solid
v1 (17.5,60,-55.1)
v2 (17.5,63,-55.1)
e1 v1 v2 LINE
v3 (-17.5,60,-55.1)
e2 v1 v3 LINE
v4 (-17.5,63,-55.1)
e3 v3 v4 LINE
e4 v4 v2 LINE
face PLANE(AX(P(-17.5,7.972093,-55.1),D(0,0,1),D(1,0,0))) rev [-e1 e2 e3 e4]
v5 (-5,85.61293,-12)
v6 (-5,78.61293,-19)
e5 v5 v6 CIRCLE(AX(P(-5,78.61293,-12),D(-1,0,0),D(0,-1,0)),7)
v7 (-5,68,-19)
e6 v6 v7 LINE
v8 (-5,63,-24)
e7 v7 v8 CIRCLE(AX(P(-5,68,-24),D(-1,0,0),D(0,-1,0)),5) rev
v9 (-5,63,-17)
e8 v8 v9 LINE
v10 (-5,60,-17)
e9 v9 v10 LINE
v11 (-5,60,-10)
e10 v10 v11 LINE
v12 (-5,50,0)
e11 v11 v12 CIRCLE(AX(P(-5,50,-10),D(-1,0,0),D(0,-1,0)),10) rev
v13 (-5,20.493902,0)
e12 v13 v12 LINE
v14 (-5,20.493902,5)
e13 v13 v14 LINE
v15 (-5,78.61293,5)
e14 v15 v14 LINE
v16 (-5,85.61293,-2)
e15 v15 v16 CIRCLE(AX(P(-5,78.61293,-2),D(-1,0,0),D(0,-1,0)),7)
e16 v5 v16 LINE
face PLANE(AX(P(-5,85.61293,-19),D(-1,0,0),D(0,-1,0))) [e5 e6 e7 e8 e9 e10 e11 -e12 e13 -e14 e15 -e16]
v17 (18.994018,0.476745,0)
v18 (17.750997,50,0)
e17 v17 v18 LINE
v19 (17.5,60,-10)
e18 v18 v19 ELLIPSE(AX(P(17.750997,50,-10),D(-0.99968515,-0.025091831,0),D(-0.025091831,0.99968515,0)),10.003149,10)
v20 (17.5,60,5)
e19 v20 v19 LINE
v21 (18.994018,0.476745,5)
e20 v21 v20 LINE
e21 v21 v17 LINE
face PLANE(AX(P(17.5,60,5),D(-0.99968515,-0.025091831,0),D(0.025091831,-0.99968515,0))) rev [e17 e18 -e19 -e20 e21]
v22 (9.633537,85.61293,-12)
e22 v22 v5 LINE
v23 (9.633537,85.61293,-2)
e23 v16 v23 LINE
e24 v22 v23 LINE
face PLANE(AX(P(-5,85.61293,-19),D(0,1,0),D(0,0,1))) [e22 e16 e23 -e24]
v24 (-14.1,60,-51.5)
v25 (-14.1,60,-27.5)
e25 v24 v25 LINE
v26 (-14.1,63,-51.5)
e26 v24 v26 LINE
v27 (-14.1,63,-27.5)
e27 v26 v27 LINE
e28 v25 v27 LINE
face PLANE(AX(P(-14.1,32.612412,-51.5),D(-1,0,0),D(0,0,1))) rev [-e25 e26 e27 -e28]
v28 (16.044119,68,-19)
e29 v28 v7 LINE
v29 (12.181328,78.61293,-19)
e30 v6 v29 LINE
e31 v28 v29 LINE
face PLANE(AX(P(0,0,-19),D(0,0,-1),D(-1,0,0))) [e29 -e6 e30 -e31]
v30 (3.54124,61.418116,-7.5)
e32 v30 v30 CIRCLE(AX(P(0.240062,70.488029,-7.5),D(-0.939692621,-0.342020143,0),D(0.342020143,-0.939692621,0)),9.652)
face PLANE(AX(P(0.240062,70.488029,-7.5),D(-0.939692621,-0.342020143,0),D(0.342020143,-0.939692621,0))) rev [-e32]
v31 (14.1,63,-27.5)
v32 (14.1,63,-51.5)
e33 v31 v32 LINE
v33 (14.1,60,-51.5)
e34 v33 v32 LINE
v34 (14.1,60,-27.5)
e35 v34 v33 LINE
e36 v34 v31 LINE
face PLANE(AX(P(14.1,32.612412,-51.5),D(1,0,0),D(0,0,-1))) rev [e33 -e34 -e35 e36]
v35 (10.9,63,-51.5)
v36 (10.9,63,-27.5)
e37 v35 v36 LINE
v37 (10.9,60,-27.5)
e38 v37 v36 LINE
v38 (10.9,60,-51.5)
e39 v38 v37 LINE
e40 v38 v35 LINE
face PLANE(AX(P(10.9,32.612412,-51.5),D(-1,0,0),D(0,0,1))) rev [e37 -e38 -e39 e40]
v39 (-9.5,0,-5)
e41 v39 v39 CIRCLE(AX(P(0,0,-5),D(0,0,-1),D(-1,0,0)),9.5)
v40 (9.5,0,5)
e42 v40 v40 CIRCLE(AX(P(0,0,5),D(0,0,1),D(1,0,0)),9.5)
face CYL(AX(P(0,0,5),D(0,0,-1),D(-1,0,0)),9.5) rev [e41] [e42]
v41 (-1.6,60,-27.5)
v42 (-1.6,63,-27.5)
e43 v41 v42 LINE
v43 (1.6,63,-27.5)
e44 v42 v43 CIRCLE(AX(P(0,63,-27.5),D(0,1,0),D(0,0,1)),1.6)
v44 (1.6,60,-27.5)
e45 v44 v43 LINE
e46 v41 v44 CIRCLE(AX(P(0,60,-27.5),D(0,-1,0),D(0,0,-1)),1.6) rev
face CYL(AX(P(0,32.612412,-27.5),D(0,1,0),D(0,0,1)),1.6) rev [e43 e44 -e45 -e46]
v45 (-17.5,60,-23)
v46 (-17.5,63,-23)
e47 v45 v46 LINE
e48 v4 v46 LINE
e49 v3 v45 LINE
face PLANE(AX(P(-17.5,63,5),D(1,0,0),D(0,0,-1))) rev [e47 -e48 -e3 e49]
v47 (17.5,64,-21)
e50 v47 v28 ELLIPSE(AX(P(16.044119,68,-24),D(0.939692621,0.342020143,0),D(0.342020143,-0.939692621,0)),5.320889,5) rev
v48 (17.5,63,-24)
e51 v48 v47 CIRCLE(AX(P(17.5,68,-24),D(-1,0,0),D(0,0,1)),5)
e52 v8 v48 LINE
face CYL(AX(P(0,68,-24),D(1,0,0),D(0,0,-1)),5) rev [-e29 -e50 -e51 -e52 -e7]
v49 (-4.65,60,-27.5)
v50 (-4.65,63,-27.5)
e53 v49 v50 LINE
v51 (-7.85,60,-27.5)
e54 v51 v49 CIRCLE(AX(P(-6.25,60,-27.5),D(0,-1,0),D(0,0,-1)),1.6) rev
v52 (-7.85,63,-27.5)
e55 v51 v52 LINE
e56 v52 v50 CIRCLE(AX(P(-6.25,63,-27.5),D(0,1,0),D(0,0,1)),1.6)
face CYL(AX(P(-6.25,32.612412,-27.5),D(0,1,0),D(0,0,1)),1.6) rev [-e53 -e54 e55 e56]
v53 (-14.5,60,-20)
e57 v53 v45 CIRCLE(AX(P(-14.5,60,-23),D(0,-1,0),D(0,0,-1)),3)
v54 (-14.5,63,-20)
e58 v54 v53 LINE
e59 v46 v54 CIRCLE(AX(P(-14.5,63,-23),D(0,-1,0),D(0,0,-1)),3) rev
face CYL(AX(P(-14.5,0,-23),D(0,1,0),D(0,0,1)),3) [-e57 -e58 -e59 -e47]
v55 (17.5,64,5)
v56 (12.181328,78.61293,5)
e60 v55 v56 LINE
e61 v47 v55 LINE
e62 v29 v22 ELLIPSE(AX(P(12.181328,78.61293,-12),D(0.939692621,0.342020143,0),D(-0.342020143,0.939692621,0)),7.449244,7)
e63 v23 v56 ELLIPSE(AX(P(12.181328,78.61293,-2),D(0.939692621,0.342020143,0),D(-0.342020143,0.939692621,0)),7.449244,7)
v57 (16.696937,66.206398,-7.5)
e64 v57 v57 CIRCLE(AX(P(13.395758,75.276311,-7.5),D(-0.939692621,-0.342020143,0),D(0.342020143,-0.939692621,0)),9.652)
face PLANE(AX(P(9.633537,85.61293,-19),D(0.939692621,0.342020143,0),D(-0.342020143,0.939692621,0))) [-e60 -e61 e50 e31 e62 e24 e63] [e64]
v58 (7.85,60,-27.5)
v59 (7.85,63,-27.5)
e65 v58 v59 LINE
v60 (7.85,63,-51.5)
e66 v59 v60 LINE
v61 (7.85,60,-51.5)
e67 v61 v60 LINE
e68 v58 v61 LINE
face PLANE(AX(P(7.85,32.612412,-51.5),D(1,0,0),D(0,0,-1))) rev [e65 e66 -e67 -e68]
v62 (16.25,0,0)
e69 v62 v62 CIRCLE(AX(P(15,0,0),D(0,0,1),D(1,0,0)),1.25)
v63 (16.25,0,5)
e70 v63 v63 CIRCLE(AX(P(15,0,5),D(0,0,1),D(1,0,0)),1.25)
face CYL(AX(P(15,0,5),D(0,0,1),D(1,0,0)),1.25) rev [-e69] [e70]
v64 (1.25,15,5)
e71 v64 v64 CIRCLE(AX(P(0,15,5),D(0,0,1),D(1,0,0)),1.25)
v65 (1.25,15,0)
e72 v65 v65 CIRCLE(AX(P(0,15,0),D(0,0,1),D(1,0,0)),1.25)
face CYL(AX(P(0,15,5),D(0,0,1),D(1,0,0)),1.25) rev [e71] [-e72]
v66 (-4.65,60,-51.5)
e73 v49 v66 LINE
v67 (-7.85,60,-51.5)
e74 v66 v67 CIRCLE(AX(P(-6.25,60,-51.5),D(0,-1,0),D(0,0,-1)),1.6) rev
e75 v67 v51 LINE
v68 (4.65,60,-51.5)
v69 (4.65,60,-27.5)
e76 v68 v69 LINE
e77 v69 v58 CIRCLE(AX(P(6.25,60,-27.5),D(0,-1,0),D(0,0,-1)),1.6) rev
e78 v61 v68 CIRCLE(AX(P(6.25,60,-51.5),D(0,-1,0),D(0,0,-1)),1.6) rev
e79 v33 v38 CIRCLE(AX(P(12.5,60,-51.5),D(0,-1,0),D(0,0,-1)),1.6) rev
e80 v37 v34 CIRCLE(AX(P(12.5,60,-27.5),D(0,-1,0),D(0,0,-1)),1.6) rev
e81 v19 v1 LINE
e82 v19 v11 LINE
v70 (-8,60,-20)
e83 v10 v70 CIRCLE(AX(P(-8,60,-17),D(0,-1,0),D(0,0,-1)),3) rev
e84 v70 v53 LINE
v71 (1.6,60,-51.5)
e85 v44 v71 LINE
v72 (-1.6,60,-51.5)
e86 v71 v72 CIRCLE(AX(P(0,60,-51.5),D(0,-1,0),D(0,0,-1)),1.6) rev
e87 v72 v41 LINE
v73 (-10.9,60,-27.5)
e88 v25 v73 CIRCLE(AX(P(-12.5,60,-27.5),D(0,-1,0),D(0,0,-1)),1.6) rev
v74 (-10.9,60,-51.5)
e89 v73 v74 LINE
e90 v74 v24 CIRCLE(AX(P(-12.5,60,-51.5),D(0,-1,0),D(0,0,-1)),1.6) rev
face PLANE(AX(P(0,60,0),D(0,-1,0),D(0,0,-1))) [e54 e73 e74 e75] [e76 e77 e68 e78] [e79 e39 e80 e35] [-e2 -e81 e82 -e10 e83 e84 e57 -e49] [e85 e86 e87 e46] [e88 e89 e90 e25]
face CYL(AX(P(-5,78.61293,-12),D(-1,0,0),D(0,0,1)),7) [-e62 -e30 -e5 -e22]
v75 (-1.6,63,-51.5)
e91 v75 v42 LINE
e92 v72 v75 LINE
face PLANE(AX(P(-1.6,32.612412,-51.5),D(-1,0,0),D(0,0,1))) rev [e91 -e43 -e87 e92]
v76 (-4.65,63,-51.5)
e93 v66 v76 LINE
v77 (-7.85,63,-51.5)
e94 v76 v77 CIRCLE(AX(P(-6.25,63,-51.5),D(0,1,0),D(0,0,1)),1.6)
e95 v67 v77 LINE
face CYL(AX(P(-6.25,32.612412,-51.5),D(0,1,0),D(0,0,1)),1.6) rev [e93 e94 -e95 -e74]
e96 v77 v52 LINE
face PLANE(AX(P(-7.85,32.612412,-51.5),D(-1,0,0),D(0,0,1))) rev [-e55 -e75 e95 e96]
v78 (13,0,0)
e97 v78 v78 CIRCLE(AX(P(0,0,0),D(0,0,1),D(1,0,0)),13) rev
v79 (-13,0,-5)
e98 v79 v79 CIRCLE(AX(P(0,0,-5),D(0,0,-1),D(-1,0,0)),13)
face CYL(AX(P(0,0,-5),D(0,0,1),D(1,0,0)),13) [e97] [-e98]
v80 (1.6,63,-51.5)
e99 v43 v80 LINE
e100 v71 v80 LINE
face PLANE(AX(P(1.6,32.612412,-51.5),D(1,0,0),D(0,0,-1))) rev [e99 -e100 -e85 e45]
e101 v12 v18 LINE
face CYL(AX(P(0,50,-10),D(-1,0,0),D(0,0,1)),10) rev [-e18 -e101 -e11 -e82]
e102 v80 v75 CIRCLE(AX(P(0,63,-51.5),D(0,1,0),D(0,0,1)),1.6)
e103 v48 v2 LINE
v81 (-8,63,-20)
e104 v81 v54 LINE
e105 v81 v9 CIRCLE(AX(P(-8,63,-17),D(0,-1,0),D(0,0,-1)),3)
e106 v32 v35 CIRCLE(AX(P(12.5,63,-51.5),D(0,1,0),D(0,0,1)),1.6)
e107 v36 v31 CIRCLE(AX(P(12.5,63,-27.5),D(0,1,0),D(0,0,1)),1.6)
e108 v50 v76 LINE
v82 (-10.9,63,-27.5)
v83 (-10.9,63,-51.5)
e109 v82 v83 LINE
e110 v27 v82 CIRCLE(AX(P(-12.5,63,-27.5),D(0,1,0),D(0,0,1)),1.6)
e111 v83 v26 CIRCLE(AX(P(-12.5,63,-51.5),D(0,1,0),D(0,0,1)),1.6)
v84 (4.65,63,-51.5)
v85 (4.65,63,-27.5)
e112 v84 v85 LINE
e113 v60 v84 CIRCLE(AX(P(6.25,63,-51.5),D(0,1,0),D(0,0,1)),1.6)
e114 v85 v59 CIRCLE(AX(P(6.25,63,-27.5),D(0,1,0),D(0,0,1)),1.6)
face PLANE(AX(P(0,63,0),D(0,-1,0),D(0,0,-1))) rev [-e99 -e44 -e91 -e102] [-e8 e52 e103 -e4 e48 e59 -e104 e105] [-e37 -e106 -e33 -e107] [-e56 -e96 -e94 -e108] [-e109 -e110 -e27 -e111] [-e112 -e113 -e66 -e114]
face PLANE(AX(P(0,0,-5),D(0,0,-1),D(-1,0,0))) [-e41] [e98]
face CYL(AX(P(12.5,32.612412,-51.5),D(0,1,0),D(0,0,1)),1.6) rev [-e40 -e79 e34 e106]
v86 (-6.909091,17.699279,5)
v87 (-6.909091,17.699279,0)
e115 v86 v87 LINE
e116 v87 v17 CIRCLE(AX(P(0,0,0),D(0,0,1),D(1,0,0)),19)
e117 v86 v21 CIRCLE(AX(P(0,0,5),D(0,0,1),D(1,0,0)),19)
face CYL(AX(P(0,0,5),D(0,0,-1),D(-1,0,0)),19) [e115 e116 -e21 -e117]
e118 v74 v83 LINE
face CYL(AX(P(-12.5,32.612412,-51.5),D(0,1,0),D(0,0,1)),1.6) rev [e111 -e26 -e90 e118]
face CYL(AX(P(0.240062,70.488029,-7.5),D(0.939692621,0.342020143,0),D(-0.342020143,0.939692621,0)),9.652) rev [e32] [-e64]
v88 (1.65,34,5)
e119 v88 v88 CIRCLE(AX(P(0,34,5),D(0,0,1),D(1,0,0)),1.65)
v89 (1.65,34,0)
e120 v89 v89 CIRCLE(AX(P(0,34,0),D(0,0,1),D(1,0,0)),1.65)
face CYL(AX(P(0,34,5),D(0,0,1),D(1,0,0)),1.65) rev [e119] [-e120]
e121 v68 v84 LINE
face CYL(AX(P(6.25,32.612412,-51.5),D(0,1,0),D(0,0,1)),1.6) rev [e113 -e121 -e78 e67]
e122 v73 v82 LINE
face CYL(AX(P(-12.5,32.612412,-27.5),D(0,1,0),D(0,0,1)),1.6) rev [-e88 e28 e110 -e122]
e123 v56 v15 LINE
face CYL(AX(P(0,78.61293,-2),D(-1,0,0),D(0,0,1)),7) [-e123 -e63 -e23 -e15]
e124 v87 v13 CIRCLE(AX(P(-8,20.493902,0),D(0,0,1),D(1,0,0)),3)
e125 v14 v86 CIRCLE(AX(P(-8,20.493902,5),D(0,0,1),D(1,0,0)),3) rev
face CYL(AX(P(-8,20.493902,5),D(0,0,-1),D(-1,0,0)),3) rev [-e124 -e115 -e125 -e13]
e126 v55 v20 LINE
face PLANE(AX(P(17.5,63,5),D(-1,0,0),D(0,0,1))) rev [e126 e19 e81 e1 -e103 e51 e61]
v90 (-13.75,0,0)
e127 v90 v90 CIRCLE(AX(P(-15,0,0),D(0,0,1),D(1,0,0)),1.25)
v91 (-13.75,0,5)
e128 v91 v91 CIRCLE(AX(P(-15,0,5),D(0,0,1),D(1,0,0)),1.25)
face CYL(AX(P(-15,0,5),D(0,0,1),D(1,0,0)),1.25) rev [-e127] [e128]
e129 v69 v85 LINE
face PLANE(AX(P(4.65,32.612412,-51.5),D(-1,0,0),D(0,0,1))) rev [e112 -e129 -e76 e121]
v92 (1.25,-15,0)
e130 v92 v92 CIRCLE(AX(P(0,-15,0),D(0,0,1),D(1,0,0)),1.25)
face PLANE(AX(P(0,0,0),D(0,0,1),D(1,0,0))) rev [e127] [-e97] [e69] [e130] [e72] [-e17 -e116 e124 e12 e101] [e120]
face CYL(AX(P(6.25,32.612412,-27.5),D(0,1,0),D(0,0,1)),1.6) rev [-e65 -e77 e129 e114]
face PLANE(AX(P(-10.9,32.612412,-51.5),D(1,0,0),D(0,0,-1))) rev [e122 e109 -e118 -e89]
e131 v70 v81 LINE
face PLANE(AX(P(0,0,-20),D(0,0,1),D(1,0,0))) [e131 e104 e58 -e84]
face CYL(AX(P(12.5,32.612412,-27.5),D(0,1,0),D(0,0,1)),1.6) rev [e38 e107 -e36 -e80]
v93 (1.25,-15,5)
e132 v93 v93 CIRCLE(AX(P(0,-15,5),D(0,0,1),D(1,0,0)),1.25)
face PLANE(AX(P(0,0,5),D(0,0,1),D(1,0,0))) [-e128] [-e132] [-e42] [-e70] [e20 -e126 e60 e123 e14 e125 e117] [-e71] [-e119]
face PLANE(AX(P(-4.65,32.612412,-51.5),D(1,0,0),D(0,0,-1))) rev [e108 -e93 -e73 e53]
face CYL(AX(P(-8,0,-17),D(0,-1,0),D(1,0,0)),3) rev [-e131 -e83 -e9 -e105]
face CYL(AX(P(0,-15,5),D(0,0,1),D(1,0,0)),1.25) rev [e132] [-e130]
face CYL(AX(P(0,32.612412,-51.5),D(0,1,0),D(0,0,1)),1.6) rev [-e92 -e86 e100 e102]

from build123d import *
from build123d.topology import SkipClean

# Parameters (mm, degrees)
SKETCH2_R                 = 9.5
BOSS_EXTRUDE1_DEPTH       = 5
SKETCH3_W                 = 35
SKETCH3_H                 = 85.128
BOSS_EXTRUDE2_DEPTH       = 3
BOSS_EXTRUDE3_START       = 5
SKETCH4_R                 = 13
SKETCH4_R_2               = 9.5
BOSS_EXTRUDE3_DEPTH       = 5
SKETCH5_W                 = 35
SKETCH5_H                 = 9
BOSS_EXTRUDE4_DEPTH       = 3
M3X0_5_TAPPED_HOLE1_D     = 2.5
M3X0_5_TAPPED_HOLE1_DEPTH = 3
BOSS_EXTRUDE5_DEPTH       = 24
SKETCH11_R                = 9.652
CUT_EXTRUDE1_DEPTH        = 14
CUT_EXTRUDE2_START        = -5
CUT_EXTRUDE2_DEPTH        = 5
CUT_EXTRUDE4_DEPTH        = 3
SKETCH15_W                = 35
SKETCH15_H                = 25.028
CUT_EXTRUDE5_DEPTH        = 12
M3X0_5_TAPPED_HOLE2_D     = 2.5
M3X0_5_TAPPED_HOLE2_DEPTH = 6.5
M3X0_5_TAPPED_HOLE2_TIP   = 0.751075774
FILLET7_R                 = 7
BOSS_EXTRUDE6_START       = -5
BOSS_EXTRUDE6_DEPTH       = 5
FILLET3_R                 = 5
CUT_EXTRUDE6_START        = -25
CUT_EXTRUDE6_DEPTH        = 25
FILLET5_R                 = 10
FILLET4_R                 = 3
M4X0_7_TAPPED_HOLE1_D     = 3.3


with BuildPart() as part:
    # Sketch2 → Boss-Extrude1 (new body)
    with BuildSketch(Plane.XY):
        with BuildLine():
            Line((-18.994017858, 0.476744791), (-17.5, 60))
            Line((-17.5, 60), (17.5, 60))
            Line((17.5, 60), (18.994017858, 0.476744791))
            ThreePointArc((18.994017858, 0.476744791), (0, -19), (-18.994017858, 0.476744791))
        make_face()
        Circle(SKETCH2_R, mode=Mode.SUBTRACT)
    extrude(amount=BOSS_EXTRUDE1_DEPTH)

    # Sketch3 → Boss-Extrude2 (add)
    with BuildSketch(Plane(origin=(0, 60, 0), x_dir=(1, 0, 0), z_dir=(0, 1, 0))):
        with Locations((0, 37.564)):
            Rectangle(SKETCH3_W, SKETCH3_H)
    extrude(amount=BOSS_EXTRUDE2_DEPTH)

    # Sketch4 → Boss-Extrude3 (add)
    with SkipClean():  # the faces are left unmerged after this step: merging them gives an invalid solid
        with BuildSketch(Plane(origin=(0, 0, 0), x_dir=(-1, 0, 0), z_dir=(0, 0, -1)).offset(BOSS_EXTRUDE3_START)):
            with Locations(Location((0, 0, 0), (0, 0, 180))):
                Circle(SKETCH4_R)
            Circle(SKETCH4_R_2, mode=Mode.SUBTRACT)
        extrude(amount=-BOSS_EXTRUDE3_DEPTH)

    # Sketch5 → Boss-Extrude4 (add)
    with SkipClean():  # the faces are left unmerged after this step: merging them gives an invalid solid
        with BuildSketch(Plane(origin=(0, 0, -80.128), x_dir=(-1, 0, 0), z_dir=(0, 0, -1))):
            with Locations((0, 55.5)):
                Rectangle(SKETCH5_W, SKETCH5_H)
        extrude(amount=-BOSS_EXTRUDE4_DEPTH)

    # M3x0.5 Tapped Hole1
    with Locations(Plane(origin=(0, 0, -80.128), x_dir=(1, 0, 0), z_dir=(0, 0, -1))):
        with Locations((12, -55.5), (0, -55.5), (-12, -55.5)):
            Hole(M3X0_5_TAPPED_HOLE1_D / 2, depth=M3X0_5_TAPPED_HOLE1_DEPTH)

    # Sketch10 → Boss-Extrude5 (add)
    with SkipClean():  # the faces are left unmerged after this step: merging them gives an invalid solid
        with BuildSketch(Plane.XY.offset(5)):
            Polygon((-5, 85.612930278), (-5, 63), (17.5, 63), (17.5, 64), (9.633536704, 85.612930278), align=None)
        extrude(amount=-BOSS_EXTRUDE5_DEPTH)

    # Sketch11 → Cut-Extrude1 (cut)
    with SkipClean():  # the faces are left unmerged after this step: merging them gives an invalid solid
        with BuildSketch(Plane(origin=(-1.821352029, 117.084978414, 0), x_dir=(0, 0, -1), z_dir=(-0.9396926207859069, -0.34202014332567293, 0))):
            with Locations(Location((7.5, 44.49185408, 0), (0, 0, 90))):
                Circle(SKETCH11_R)
        extrude(amount=CUT_EXTRUDE1_DEPTH, mode=Mode.SUBTRACT)

    # Sketch12 → Cut-Extrude2 (cut)
    with SkipClean():  # the faces are left unmerged after this step: merging them gives an invalid solid
        with BuildSketch(Plane.XY.offset(5).offset(CUT_EXTRUDE2_START)):
            with BuildLine():
                Line((-13.548939673, 58), (13.548939673, 58))
                Line((13.548939673, 58), (14.702658736, 12.034609511))
                ThreePointArc((14.702658736, 12.034609511), (0, 19), (-14.702658736, 12.034609511))
                Line((-14.702658736, 12.034609511), (-13.548939673, 58))
            make_face()
        extrude(amount=CUT_EXTRUDE2_DEPTH, mode=Mode.SUBTRACT)

    # Sketch14 → Cut-Extrude4 (cut)
    with SkipClean():  # the faces are left unmerged after this step: merging them gives an invalid solid
        with BuildSketch(Plane(origin=(0, 63, 0), x_dir=(1, 0, 0), z_dir=(0, 1, 0))):
            with BuildLine():
                Line((-14.1, 51.5), (-14.1, 27.5))
                ThreePointArc((-14.1, 27.5), (-12.5, 25.9), (-10.9, 27.5))
                Line((-10.9, 27.5), (-10.9, 51.5))
                ThreePointArc((-10.9, 51.5), (-12.5, 53.1), (-14.1, 51.5))
            make_face()
            with BuildLine():
                Line((-1.6, 51.5), (-1.6, 27.5))
                ThreePointArc((-1.6, 27.5), (0, 25.9), (1.6, 27.5))
                Line((1.6, 27.5), (1.6, 51.5))
                ThreePointArc((1.6, 51.5), (0, 53.1), (-1.6, 51.5))
            make_face()
            with BuildLine():
                Line((10.9, 51.5), (10.9, 27.5))
                ThreePointArc((10.9, 27.5), (12.5, 25.9), (14.1, 27.5))
                Line((14.1, 27.5), (14.1, 51.5))
                ThreePointArc((14.1, 51.5), (12.5, 53.1), (10.9, 51.5))
            make_face()
            with BuildLine():
                Line((-7.85, 51.5), (-7.85, 27.5))
                ThreePointArc((-7.85, 27.5), (-6.25, 25.9), (-4.65, 27.5))
                Line((-4.65, 27.5), (-4.65, 51.5))
                ThreePointArc((-4.65, 51.5), (-6.25, 53.1), (-7.85, 51.5))
            make_face()
            with BuildLine():
                Line((4.65, 51.5), (4.65, 27.5))
                ThreePointArc((4.65, 27.5), (6.25, 25.9), (7.85, 27.5))
                Line((7.85, 27.5), (7.85, 51.5))
                ThreePointArc((7.85, 51.5), (6.25, 53.1), (4.65, 51.5))
            make_face()
        extrude(amount=-CUT_EXTRUDE4_DEPTH, mode=Mode.SUBTRACT)

    # Sketch15 → Cut-Extrude5 (cut)
    with SkipClean():  # the faces are left unmerged after this step: merging them gives an invalid solid
        with BuildSketch(Plane(origin=(0, 63, 0), x_dir=(1, 0, 0), z_dir=(0, 1, 0))):
            with Locations((0, 67.614)):
                Rectangle(SKETCH15_W, SKETCH15_H)
        extrude(amount=-CUT_EXTRUDE5_DEPTH, mode=Mode.SUBTRACT)

    # M3x0.5 Tapped Hole2
    with Locations(Plane.XY.offset(5)):
        with Locations((0, 15), (15, 0), (0, -15), (-15, 0)):
            Hole(M3X0_5_TAPPED_HOLE2_D / 2, depth=M3X0_5_TAPPED_HOLE2_DEPTH)
            with Locations((0, 0, -(M3X0_5_TAPPED_HOLE2_DEPTH + M3X0_5_TAPPED_HOLE2_TIP / 2))):  # 118° drill point
                Cone(0, M3X0_5_TAPPED_HOLE2_D / 2, M3X0_5_TAPPED_HOLE2_TIP, mode=Mode.SUBTRACT)

    # Fillet7
    fillet7_edges = [part.edges().sort_by_distance(p)[0] for p in [
        (2.316768352, 85.612930278, 5),
        (2.316768352, 85.612930278, -19),
    ]]
    fillet(fillet7_edges, radius=FILLET7_R)

    # Sketch22 → Boss-Extrude6 (add)
    with SkipClean():  # the faces are left unmerged after this step: merging them gives an invalid solid
        with BuildSketch(Plane.XY.offset(5).offset(BOSS_EXTRUDE6_START)):
            with BuildLine():
                Line((-5, 58), (-5, 18.33030278))
                ThreePointArc((-5, 18.33030278), (5.783107735, 18.098498969), (14.702658736, 12.034609511))
                Line((14.702658736, 12.034609511), (13.548939673, 58))
                Line((13.548939673, 58), (-5, 58))
            make_face()
        extrude(amount=BOSS_EXTRUDE6_DEPTH)

    # Fillet3
    # the kernel refuses this fillet: 5 mm, written as the material it adds along each edge
    with BuildSketch(Plane(origin=(-5, 63, -19), x_dir=(0, 1, 0), z_dir=(1, 0, 0))) as fillet3_piece_1_section:
        with BuildLine():
            CenterArc((FILLET3_R, -FILLET3_R), FILLET3_R, 90, 90)
            Line((0, -FILLET3_R), (0, 0))
            Line((0, 0), (FILLET3_R, 0))
        make_face()
    fillet3_piece_1 = extrude(amount=22.5, mode=Mode.PRIVATE)
    fillet3_piece_1 = split(fillet3_piece_1, bisect_by=Plane(origin=(16.135828419, 67.748030616, -20.138902613), z_dir=(-0.9396926207859069, -0.34202014332567293, 0)), keep=Keep.TOP, mode=Mode.PRIVATE)
    add(fillet3_piece_1)

    # Sketch25 → Cut-Extrude6 (cut)
    with SkipClean():  # the faces are left unmerged after this step: merging them gives an invalid solid
        with BuildSketch(Plane.XY.offset(5).offset(CUT_EXTRUDE6_START)):
            with BuildLine():
                Line((-5, 63), (-17.5, 63))
                Line((-17.5, 63), (-18.994017858, 0.476744791))
                ThreePointArc((-18.994017858, 0.476744791), (-14.953782346, 11.721108887), (-5, 18.33030278))
                Line((-5, 18.33030278), (-5, 63))
            make_face()
        extrude(amount=CUT_EXTRUDE6_DEPTH, mode=Mode.SUBTRACT)

    # Fillet5
    # the kernel refuses this fillet: 10 mm, written as the material it adds along each edge
    with BuildSketch(Plane(origin=(-5, 60, 0), x_dir=(0, 0, -1), z_dir=(1, 0, 0))) as fillet5_piece_1:
        with BuildLine():
            CenterArc((FILLET5_R, -FILLET5_R), FILLET5_R, 90, 90)
            Line((0, -FILLET5_R), (0, 0))
            Line((0, 0), (FILLET5_R, 0))
        make_face()
    extrude(amount=22.5)
    with BuildSketch(Plane(origin=(-5, 60, 0), x_dir=(0, 0, -1), z_dir=(1, 0, 0))) as fillet5_piece_2_section:
        with BuildLine():
            CenterArc((FILLET5_R, -FILLET5_R), FILLET5_R, 90, 90)
            Line((0, -FILLET5_R), (0, 0))
            Line((0, 0), (FILLET5_R, 0))
        make_face()
    fillet5_piece_2 = extrude(amount=47.5, mode=Mode.PRIVATE)
    fillet5_piece_2 = split(fillet5_piece_2, bisect_by=Plane(origin=(17.5, 55.698819483, -1.064725127), z_dir=(1, 0, 0)), keep=Keep.TOP, mode=Mode.PRIVATE)
    fillet5_piece_2 = split(fillet5_piece_2, bisect_by=Plane(origin=(17.607924501, 55.700173495, -1.064725127), z_dir=(-0.9996851504403609, -0.0250918311215615, 0)), keep=Keep.TOP, mode=Mode.PRIVATE)
    add(fillet5_piece_2)

    # Fillet4
    fillet4_edges = [part.edges().sort_by_distance(p)[0] for p in [
        (-5, 18.33030278, 2.5),
        (-17.5, 61.5, -20),
        (-5, 61.5, -20),
    ]]
    fillet(fillet4_edges, radius=FILLET4_R)

    # M4x0.7 Tapped Hole1 (through all)
    with Locations(Plane.XY.offset(5)):
        with Locations((0, 34)):
            Hole(M4X0_7_TAPPED_HOLE1_D / 2)


solid = part.part
